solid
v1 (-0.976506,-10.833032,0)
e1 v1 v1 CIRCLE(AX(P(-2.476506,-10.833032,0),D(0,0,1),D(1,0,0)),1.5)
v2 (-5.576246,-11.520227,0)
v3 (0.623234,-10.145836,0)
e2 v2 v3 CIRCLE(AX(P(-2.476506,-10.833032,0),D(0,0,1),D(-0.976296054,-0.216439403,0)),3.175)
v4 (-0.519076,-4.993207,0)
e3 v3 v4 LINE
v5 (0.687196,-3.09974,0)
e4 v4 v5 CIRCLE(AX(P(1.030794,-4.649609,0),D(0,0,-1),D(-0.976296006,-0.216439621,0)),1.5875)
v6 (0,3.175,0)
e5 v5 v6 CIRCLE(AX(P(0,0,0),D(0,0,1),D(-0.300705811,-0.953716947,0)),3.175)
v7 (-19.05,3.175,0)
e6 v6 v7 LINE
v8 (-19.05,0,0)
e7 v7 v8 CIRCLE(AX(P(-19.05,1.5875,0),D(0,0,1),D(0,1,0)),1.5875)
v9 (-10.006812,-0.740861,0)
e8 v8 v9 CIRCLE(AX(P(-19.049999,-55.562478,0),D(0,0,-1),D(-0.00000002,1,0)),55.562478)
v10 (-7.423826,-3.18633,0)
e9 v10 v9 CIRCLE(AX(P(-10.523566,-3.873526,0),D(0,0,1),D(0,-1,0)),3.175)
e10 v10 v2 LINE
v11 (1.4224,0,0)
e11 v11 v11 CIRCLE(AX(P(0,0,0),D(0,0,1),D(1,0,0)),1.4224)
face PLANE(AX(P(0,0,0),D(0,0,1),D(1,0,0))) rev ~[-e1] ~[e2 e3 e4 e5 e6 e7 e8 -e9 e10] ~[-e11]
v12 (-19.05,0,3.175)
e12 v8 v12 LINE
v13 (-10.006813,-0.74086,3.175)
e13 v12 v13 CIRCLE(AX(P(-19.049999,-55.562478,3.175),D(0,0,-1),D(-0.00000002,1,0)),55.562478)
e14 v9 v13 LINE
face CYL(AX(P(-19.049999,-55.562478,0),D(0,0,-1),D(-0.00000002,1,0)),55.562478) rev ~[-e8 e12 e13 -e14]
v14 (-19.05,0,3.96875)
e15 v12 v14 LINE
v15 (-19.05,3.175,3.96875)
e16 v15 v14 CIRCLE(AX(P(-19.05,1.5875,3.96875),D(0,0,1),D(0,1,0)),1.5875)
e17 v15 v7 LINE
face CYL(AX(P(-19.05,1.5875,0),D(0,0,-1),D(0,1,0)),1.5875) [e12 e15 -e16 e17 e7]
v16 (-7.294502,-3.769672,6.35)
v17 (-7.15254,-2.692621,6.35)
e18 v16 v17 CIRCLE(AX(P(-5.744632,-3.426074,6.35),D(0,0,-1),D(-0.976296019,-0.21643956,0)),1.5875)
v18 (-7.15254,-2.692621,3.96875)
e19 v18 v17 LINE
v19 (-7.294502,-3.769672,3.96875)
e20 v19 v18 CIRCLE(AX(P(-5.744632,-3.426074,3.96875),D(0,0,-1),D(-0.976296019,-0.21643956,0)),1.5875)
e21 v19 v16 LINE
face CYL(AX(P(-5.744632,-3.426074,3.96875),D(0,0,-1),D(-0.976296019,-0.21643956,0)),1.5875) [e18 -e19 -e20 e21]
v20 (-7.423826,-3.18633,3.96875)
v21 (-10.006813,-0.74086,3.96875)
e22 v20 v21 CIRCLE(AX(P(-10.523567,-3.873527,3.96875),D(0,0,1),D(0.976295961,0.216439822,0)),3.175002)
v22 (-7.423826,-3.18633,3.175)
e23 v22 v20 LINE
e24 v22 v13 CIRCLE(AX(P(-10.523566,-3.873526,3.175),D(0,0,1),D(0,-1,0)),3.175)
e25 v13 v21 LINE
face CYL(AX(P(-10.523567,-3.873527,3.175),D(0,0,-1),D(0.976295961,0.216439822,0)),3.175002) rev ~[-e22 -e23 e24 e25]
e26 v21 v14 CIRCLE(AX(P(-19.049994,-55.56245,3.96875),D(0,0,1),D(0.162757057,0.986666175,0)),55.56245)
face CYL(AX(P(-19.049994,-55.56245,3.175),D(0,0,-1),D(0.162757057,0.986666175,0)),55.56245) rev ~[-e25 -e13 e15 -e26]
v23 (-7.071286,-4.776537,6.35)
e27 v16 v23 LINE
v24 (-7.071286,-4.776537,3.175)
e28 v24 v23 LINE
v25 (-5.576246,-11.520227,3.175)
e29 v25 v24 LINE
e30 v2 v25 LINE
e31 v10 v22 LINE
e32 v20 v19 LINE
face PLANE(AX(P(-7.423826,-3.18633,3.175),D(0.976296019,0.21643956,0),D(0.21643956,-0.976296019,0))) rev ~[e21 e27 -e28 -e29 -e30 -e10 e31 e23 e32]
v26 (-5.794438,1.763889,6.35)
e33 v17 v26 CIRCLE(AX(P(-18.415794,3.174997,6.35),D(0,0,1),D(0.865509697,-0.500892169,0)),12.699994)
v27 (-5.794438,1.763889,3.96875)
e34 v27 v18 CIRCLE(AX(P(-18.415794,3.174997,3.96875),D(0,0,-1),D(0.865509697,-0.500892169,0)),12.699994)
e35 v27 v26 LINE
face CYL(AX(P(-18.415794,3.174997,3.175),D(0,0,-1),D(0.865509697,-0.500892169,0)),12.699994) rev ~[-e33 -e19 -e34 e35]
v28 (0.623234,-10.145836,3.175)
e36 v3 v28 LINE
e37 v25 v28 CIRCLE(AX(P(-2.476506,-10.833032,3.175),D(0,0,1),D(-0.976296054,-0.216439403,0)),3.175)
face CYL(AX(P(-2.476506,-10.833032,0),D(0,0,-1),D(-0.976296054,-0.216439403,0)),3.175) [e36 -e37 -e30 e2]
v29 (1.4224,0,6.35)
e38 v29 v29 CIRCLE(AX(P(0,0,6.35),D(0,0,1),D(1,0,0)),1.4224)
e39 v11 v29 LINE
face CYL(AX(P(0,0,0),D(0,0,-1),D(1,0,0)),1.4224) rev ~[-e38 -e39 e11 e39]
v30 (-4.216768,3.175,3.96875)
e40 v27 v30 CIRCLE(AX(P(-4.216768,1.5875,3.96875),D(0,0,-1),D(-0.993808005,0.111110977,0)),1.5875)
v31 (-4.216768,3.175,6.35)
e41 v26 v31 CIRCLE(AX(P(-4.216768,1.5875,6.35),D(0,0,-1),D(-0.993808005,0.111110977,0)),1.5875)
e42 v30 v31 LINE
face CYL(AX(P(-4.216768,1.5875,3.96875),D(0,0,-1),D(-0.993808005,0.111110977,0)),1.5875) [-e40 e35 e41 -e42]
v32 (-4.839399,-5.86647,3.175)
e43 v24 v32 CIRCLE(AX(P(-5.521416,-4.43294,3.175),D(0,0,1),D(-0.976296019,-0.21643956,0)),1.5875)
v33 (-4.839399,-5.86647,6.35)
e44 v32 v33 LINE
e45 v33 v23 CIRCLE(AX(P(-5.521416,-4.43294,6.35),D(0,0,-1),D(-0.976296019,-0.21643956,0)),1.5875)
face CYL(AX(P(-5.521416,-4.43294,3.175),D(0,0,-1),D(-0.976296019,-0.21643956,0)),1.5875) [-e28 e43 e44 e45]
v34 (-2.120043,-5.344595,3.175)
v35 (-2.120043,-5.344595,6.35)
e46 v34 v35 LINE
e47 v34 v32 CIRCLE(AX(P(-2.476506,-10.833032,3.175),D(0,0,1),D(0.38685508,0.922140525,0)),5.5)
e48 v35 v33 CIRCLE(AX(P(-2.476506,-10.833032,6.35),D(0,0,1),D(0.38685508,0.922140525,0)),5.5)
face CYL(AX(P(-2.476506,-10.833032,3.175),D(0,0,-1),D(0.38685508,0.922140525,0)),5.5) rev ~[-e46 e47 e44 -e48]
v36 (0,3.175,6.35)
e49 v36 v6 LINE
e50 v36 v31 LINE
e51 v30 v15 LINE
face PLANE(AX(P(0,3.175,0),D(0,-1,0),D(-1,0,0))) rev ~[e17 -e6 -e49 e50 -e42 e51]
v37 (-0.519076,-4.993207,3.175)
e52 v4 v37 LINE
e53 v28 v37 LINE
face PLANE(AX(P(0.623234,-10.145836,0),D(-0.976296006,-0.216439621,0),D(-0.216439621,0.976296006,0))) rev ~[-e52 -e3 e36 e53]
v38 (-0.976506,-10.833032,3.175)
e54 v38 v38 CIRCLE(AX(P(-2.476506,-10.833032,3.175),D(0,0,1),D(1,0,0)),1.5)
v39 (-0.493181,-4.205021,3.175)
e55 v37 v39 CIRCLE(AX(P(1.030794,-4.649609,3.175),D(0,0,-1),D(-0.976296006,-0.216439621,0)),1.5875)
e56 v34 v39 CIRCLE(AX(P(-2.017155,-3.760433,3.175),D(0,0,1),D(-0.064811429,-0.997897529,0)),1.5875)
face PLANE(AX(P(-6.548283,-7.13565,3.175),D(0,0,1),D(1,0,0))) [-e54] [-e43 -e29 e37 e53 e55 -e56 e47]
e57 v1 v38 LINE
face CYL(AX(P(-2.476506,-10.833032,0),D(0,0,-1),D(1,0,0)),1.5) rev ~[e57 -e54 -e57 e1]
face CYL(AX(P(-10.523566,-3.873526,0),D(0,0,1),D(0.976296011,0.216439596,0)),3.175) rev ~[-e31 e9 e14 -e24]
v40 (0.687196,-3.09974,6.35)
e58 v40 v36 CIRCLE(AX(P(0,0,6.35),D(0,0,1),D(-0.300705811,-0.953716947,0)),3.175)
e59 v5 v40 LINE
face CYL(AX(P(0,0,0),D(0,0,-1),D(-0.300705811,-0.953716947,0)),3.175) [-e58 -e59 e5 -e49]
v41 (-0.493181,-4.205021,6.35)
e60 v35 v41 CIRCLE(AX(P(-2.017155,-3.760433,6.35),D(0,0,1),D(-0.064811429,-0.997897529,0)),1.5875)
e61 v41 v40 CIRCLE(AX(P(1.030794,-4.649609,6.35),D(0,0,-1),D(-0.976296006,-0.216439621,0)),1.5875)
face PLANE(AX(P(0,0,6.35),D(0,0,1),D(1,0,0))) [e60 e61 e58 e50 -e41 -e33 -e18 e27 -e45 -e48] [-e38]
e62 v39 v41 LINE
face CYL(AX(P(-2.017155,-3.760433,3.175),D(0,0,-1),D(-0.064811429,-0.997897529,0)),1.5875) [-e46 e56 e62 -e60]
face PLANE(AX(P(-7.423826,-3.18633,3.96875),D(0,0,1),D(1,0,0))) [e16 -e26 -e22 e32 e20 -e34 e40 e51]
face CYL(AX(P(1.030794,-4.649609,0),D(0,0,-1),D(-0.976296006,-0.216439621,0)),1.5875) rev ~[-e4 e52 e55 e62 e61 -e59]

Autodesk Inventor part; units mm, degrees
ref_plane "YZ Plane" through (0, 0, 0) normal (1, 0, 0) x (0, 1, 0)
ref_plane "XZ Plane" through (0, 0, 0) normal (0, 1, 0) x (-1, 0, 0)
ref_plane "XY Plane" through (0, 0, 0) normal (0, 0, 1) x (1, 0, 0)
sketch "Sketch1" plane through (0, 0, 0) normal (0, 0, 1) x (1, 0, 0)
  circle A0 centre (0, 0) radius 1.4224
  circle A1 centre (0, 0) radius 3.175
  line L0 (0, 0) -> (-19.05, 0) construction
  circle A2 centre (-2.476506, -10.833032) radius 3.175
  circle A3 centre (-2.476506, -10.833032) radius 5 construction
  circle A4 centre (-2.476506, -10.833032) radius 1.5
  line L1 (0, 0) -> (-2.476506, -10.833032) construction
  line L2 (-2.476506, -10.833032) -> (-3.938782, -10.498745) construction
  line L3 (0, 0) -> (-2.476506, -10.833032) construction
  arc A5 (-5.54332, -10.011281) -> (0.590309, -11.654782) centre (-2.476506, -10.833032) ccw
  arc A6 (-1.02973, -3.003378) -> (-19.05, 0) centre (-19.05, -55.5625) ccw
  arc A7 (-19.05, 3.175) -> (-19.05, 0) centre (-19.05, 1.5875) ccw
  line L4 (-19.05, 3.175) -> (0, 3.175)
  line L5 (-2.476506, -10.833032) -> (-4.878131, 0) construction
  line L6 (0.623234, -10.145836) -> (-1.778391, 0.687196)
  line L7 (-7.977871, -0.687196) -> (-5.576246, -11.520227)
  arc A8 (-5.576246, -11.520227) -> (0.623234, -10.145836) centre (-2.476506, -10.833032) ccw
  arc A9 (-1.778391, 0.687196) -> (-7.977871, -0.687196) centre (-4.878131, 0) ccw
  circle A10 centre (6.746875, -0.79375) radius 3.175
  circle A11 centre (6.746875, -0.79375) radius 1.5
  line L8 (7.117846, 2.359503) -> (0.370971, 3.153253)
  arc A12 (4.720646, -3.238136) -> (-0.236744, -6.266728) centre (2.761054, -5.602132) ccw
  circle A13 centre (6.746875, -0.79375) radius 5 construction
  point P0 (0.590309, -11.654782)
  point P1 (0, 3.175)
  point P2 (-7.878677, -1.134631)
  point P3 (-5.576246, -11.520227)
  point P4 (0.623234, -10.145836)
  point P5 (-0.954741, -3.028051)
  point P6 (-2.439066, 2.03263)
  point P7 (1.235308, -2.924832)
  point P8 (1.403608, -2.847896)
  point P9 (-1.424341, -1.064207)
  point P10 (-1.702423, 0.512874)
  point P11 (0.623234, -10.145836)
  point P12 (-5.576246, -11.520227)
  dimension "d24" = 3
  dimension "d0" = 2.8448
  dimension "d1" = 6.35
  dimension "d9" = 19.05
  dimension "d22" = 6.35
  dimension "d23" = 10
  dimension "d26" = 11.1125
  dimension "d29" = 3.175
  dimension "d30" = 6.35
  dimension "d31" = 6.35
  dimension "d32" = 3
  dimension "d36" = 10
  dimension "d37" = 102.5
  dimension "d38" = 4.7625
  dimension "d39" = 6.74688
  dimension "d40" = 0.79375
sketch "Sketch1 outline for Extrusion1" plane through (0, 0, 0) normal (0, 0, 1) x (1, 0, 0)
  arc A0 (-19.05, 3.175) -> (-19.05, 0) centre (-19.05, 1.5875) ccw
  arc A1 (-19.05, 0) -> (-7.878677, -1.134631) centre (-19.05, -55.5625) cw
  line L0 (-7.878677, -1.134631) -> (-5.576246, -11.520227)
  arc A2 (-5.576246, -11.520227) -> (0.623234, -10.145836) centre (-2.476506, -10.833032) ccw
  line L1 (0.623234, -10.145836) -> (-0.954741, -3.028051)
  arc A3 (-0.954741, -3.028051) -> (0, 3.175) centre (0, 0) ccw
  line L2 (0, 3.175) -> (-19.05, 3.175)
  circle A4 centre (0, 0) radius 1.4224
  circle A5 centre (-2.476506, -10.833032) radius 1.5
extrude "Extrusion1" add sketch "Sketch1 outline for Extrusion1" along normal blind 3.175
fillet "Fillet1" radius 3.175 1 edges at (-7.8787, -1.1346, 1.5875)
sketch "Sketch2" plane through (0, 0, 3.175) normal (0, 0, 1) x (1, 0, 0)
  circle A0 centre (-2.476506, -10.833032) radius 1.5
  arc A1 (-0.348803, -5.761259) -> (-6.548283, -7.13565) centre (-2.476506, -10.833032) ccw
  line L0 (0, 3.175) -> (-19.05, 3.175)
  arc A2 (-19.05, 3.175) -> (-19.05, 0) centre (-19.05, 1.5875) ccw
  arc A3 (-10.006813, -0.74086) -> (-19.05, 0) centre (-19.05, -55.5625) ccw
  arc A4 (-7.423826, -3.18633) -> (-10.006813, -0.74086) centre (-10.523566, -3.873526) ccw
  line L1 (-7.423826, -3.18633) -> (-5.576246, -11.520227)
  arc A5 (-5.576246, -11.520227) -> (0.623234, -10.145836) centre (-2.476506, -10.833032) ccw
  line L2 (0.623234, -10.145836) -> (-0.954741, -3.028051)
  arc A6 (-0.954741, -3.028051) -> (0, 3.175) centre (0, 0) ccw
  circle A7 centre (0, 0) radius 1.4224
  circle A8 centre (-2.476506, -10.833032) radius 1.5
  arc A9 (-7.423826, -3.18633) -> (-10.006813, -0.74086) centre (-10.523566, -3.873526) ccw
  line L3 (0, 3.175) -> (-19.05, 3.175)
  arc A10 (-7.423826, -3.18633) -> (-5.7158, 3.175) centre (-18.4158, 3.175) ccw
  line L4 (0.623234, -10.145836) -> (-0.954741, -3.028051)
  line L5 (-7.423826, -3.18633) -> (-5.576246, -11.520227)
  point P0 (-6.548283, -7.13565)
  point P1 (-5.7158, 3.175)
  point P2 (-0.348803, -5.761259)
  dimension "d41" = 11
  dimension "d42" = 12.7
extrude "Extrusion2" add sketch "Sketch2" along normal blind 0.79375 contours A1 L1 A10 L0 A6 L2 | A4 A3 A2 L0 A10
extrude "Extrusion3" add sketch "Sketch2" along normal blind 3.175 contours A1 L1 A10 L0 A6 L2
fillet "Fillet2" radius 1.5875 5 edges at (-6.5483, -7.1357, 4.7625) (-7.4238, -3.1863, 5.1594) (-5.7158, 3.175, 5.1594) (-0.9547, -3.0281, 3.175) (-0.3488, -5.7613, 4.7625)
properties part number "Lever" material "Aluminum 6061"
